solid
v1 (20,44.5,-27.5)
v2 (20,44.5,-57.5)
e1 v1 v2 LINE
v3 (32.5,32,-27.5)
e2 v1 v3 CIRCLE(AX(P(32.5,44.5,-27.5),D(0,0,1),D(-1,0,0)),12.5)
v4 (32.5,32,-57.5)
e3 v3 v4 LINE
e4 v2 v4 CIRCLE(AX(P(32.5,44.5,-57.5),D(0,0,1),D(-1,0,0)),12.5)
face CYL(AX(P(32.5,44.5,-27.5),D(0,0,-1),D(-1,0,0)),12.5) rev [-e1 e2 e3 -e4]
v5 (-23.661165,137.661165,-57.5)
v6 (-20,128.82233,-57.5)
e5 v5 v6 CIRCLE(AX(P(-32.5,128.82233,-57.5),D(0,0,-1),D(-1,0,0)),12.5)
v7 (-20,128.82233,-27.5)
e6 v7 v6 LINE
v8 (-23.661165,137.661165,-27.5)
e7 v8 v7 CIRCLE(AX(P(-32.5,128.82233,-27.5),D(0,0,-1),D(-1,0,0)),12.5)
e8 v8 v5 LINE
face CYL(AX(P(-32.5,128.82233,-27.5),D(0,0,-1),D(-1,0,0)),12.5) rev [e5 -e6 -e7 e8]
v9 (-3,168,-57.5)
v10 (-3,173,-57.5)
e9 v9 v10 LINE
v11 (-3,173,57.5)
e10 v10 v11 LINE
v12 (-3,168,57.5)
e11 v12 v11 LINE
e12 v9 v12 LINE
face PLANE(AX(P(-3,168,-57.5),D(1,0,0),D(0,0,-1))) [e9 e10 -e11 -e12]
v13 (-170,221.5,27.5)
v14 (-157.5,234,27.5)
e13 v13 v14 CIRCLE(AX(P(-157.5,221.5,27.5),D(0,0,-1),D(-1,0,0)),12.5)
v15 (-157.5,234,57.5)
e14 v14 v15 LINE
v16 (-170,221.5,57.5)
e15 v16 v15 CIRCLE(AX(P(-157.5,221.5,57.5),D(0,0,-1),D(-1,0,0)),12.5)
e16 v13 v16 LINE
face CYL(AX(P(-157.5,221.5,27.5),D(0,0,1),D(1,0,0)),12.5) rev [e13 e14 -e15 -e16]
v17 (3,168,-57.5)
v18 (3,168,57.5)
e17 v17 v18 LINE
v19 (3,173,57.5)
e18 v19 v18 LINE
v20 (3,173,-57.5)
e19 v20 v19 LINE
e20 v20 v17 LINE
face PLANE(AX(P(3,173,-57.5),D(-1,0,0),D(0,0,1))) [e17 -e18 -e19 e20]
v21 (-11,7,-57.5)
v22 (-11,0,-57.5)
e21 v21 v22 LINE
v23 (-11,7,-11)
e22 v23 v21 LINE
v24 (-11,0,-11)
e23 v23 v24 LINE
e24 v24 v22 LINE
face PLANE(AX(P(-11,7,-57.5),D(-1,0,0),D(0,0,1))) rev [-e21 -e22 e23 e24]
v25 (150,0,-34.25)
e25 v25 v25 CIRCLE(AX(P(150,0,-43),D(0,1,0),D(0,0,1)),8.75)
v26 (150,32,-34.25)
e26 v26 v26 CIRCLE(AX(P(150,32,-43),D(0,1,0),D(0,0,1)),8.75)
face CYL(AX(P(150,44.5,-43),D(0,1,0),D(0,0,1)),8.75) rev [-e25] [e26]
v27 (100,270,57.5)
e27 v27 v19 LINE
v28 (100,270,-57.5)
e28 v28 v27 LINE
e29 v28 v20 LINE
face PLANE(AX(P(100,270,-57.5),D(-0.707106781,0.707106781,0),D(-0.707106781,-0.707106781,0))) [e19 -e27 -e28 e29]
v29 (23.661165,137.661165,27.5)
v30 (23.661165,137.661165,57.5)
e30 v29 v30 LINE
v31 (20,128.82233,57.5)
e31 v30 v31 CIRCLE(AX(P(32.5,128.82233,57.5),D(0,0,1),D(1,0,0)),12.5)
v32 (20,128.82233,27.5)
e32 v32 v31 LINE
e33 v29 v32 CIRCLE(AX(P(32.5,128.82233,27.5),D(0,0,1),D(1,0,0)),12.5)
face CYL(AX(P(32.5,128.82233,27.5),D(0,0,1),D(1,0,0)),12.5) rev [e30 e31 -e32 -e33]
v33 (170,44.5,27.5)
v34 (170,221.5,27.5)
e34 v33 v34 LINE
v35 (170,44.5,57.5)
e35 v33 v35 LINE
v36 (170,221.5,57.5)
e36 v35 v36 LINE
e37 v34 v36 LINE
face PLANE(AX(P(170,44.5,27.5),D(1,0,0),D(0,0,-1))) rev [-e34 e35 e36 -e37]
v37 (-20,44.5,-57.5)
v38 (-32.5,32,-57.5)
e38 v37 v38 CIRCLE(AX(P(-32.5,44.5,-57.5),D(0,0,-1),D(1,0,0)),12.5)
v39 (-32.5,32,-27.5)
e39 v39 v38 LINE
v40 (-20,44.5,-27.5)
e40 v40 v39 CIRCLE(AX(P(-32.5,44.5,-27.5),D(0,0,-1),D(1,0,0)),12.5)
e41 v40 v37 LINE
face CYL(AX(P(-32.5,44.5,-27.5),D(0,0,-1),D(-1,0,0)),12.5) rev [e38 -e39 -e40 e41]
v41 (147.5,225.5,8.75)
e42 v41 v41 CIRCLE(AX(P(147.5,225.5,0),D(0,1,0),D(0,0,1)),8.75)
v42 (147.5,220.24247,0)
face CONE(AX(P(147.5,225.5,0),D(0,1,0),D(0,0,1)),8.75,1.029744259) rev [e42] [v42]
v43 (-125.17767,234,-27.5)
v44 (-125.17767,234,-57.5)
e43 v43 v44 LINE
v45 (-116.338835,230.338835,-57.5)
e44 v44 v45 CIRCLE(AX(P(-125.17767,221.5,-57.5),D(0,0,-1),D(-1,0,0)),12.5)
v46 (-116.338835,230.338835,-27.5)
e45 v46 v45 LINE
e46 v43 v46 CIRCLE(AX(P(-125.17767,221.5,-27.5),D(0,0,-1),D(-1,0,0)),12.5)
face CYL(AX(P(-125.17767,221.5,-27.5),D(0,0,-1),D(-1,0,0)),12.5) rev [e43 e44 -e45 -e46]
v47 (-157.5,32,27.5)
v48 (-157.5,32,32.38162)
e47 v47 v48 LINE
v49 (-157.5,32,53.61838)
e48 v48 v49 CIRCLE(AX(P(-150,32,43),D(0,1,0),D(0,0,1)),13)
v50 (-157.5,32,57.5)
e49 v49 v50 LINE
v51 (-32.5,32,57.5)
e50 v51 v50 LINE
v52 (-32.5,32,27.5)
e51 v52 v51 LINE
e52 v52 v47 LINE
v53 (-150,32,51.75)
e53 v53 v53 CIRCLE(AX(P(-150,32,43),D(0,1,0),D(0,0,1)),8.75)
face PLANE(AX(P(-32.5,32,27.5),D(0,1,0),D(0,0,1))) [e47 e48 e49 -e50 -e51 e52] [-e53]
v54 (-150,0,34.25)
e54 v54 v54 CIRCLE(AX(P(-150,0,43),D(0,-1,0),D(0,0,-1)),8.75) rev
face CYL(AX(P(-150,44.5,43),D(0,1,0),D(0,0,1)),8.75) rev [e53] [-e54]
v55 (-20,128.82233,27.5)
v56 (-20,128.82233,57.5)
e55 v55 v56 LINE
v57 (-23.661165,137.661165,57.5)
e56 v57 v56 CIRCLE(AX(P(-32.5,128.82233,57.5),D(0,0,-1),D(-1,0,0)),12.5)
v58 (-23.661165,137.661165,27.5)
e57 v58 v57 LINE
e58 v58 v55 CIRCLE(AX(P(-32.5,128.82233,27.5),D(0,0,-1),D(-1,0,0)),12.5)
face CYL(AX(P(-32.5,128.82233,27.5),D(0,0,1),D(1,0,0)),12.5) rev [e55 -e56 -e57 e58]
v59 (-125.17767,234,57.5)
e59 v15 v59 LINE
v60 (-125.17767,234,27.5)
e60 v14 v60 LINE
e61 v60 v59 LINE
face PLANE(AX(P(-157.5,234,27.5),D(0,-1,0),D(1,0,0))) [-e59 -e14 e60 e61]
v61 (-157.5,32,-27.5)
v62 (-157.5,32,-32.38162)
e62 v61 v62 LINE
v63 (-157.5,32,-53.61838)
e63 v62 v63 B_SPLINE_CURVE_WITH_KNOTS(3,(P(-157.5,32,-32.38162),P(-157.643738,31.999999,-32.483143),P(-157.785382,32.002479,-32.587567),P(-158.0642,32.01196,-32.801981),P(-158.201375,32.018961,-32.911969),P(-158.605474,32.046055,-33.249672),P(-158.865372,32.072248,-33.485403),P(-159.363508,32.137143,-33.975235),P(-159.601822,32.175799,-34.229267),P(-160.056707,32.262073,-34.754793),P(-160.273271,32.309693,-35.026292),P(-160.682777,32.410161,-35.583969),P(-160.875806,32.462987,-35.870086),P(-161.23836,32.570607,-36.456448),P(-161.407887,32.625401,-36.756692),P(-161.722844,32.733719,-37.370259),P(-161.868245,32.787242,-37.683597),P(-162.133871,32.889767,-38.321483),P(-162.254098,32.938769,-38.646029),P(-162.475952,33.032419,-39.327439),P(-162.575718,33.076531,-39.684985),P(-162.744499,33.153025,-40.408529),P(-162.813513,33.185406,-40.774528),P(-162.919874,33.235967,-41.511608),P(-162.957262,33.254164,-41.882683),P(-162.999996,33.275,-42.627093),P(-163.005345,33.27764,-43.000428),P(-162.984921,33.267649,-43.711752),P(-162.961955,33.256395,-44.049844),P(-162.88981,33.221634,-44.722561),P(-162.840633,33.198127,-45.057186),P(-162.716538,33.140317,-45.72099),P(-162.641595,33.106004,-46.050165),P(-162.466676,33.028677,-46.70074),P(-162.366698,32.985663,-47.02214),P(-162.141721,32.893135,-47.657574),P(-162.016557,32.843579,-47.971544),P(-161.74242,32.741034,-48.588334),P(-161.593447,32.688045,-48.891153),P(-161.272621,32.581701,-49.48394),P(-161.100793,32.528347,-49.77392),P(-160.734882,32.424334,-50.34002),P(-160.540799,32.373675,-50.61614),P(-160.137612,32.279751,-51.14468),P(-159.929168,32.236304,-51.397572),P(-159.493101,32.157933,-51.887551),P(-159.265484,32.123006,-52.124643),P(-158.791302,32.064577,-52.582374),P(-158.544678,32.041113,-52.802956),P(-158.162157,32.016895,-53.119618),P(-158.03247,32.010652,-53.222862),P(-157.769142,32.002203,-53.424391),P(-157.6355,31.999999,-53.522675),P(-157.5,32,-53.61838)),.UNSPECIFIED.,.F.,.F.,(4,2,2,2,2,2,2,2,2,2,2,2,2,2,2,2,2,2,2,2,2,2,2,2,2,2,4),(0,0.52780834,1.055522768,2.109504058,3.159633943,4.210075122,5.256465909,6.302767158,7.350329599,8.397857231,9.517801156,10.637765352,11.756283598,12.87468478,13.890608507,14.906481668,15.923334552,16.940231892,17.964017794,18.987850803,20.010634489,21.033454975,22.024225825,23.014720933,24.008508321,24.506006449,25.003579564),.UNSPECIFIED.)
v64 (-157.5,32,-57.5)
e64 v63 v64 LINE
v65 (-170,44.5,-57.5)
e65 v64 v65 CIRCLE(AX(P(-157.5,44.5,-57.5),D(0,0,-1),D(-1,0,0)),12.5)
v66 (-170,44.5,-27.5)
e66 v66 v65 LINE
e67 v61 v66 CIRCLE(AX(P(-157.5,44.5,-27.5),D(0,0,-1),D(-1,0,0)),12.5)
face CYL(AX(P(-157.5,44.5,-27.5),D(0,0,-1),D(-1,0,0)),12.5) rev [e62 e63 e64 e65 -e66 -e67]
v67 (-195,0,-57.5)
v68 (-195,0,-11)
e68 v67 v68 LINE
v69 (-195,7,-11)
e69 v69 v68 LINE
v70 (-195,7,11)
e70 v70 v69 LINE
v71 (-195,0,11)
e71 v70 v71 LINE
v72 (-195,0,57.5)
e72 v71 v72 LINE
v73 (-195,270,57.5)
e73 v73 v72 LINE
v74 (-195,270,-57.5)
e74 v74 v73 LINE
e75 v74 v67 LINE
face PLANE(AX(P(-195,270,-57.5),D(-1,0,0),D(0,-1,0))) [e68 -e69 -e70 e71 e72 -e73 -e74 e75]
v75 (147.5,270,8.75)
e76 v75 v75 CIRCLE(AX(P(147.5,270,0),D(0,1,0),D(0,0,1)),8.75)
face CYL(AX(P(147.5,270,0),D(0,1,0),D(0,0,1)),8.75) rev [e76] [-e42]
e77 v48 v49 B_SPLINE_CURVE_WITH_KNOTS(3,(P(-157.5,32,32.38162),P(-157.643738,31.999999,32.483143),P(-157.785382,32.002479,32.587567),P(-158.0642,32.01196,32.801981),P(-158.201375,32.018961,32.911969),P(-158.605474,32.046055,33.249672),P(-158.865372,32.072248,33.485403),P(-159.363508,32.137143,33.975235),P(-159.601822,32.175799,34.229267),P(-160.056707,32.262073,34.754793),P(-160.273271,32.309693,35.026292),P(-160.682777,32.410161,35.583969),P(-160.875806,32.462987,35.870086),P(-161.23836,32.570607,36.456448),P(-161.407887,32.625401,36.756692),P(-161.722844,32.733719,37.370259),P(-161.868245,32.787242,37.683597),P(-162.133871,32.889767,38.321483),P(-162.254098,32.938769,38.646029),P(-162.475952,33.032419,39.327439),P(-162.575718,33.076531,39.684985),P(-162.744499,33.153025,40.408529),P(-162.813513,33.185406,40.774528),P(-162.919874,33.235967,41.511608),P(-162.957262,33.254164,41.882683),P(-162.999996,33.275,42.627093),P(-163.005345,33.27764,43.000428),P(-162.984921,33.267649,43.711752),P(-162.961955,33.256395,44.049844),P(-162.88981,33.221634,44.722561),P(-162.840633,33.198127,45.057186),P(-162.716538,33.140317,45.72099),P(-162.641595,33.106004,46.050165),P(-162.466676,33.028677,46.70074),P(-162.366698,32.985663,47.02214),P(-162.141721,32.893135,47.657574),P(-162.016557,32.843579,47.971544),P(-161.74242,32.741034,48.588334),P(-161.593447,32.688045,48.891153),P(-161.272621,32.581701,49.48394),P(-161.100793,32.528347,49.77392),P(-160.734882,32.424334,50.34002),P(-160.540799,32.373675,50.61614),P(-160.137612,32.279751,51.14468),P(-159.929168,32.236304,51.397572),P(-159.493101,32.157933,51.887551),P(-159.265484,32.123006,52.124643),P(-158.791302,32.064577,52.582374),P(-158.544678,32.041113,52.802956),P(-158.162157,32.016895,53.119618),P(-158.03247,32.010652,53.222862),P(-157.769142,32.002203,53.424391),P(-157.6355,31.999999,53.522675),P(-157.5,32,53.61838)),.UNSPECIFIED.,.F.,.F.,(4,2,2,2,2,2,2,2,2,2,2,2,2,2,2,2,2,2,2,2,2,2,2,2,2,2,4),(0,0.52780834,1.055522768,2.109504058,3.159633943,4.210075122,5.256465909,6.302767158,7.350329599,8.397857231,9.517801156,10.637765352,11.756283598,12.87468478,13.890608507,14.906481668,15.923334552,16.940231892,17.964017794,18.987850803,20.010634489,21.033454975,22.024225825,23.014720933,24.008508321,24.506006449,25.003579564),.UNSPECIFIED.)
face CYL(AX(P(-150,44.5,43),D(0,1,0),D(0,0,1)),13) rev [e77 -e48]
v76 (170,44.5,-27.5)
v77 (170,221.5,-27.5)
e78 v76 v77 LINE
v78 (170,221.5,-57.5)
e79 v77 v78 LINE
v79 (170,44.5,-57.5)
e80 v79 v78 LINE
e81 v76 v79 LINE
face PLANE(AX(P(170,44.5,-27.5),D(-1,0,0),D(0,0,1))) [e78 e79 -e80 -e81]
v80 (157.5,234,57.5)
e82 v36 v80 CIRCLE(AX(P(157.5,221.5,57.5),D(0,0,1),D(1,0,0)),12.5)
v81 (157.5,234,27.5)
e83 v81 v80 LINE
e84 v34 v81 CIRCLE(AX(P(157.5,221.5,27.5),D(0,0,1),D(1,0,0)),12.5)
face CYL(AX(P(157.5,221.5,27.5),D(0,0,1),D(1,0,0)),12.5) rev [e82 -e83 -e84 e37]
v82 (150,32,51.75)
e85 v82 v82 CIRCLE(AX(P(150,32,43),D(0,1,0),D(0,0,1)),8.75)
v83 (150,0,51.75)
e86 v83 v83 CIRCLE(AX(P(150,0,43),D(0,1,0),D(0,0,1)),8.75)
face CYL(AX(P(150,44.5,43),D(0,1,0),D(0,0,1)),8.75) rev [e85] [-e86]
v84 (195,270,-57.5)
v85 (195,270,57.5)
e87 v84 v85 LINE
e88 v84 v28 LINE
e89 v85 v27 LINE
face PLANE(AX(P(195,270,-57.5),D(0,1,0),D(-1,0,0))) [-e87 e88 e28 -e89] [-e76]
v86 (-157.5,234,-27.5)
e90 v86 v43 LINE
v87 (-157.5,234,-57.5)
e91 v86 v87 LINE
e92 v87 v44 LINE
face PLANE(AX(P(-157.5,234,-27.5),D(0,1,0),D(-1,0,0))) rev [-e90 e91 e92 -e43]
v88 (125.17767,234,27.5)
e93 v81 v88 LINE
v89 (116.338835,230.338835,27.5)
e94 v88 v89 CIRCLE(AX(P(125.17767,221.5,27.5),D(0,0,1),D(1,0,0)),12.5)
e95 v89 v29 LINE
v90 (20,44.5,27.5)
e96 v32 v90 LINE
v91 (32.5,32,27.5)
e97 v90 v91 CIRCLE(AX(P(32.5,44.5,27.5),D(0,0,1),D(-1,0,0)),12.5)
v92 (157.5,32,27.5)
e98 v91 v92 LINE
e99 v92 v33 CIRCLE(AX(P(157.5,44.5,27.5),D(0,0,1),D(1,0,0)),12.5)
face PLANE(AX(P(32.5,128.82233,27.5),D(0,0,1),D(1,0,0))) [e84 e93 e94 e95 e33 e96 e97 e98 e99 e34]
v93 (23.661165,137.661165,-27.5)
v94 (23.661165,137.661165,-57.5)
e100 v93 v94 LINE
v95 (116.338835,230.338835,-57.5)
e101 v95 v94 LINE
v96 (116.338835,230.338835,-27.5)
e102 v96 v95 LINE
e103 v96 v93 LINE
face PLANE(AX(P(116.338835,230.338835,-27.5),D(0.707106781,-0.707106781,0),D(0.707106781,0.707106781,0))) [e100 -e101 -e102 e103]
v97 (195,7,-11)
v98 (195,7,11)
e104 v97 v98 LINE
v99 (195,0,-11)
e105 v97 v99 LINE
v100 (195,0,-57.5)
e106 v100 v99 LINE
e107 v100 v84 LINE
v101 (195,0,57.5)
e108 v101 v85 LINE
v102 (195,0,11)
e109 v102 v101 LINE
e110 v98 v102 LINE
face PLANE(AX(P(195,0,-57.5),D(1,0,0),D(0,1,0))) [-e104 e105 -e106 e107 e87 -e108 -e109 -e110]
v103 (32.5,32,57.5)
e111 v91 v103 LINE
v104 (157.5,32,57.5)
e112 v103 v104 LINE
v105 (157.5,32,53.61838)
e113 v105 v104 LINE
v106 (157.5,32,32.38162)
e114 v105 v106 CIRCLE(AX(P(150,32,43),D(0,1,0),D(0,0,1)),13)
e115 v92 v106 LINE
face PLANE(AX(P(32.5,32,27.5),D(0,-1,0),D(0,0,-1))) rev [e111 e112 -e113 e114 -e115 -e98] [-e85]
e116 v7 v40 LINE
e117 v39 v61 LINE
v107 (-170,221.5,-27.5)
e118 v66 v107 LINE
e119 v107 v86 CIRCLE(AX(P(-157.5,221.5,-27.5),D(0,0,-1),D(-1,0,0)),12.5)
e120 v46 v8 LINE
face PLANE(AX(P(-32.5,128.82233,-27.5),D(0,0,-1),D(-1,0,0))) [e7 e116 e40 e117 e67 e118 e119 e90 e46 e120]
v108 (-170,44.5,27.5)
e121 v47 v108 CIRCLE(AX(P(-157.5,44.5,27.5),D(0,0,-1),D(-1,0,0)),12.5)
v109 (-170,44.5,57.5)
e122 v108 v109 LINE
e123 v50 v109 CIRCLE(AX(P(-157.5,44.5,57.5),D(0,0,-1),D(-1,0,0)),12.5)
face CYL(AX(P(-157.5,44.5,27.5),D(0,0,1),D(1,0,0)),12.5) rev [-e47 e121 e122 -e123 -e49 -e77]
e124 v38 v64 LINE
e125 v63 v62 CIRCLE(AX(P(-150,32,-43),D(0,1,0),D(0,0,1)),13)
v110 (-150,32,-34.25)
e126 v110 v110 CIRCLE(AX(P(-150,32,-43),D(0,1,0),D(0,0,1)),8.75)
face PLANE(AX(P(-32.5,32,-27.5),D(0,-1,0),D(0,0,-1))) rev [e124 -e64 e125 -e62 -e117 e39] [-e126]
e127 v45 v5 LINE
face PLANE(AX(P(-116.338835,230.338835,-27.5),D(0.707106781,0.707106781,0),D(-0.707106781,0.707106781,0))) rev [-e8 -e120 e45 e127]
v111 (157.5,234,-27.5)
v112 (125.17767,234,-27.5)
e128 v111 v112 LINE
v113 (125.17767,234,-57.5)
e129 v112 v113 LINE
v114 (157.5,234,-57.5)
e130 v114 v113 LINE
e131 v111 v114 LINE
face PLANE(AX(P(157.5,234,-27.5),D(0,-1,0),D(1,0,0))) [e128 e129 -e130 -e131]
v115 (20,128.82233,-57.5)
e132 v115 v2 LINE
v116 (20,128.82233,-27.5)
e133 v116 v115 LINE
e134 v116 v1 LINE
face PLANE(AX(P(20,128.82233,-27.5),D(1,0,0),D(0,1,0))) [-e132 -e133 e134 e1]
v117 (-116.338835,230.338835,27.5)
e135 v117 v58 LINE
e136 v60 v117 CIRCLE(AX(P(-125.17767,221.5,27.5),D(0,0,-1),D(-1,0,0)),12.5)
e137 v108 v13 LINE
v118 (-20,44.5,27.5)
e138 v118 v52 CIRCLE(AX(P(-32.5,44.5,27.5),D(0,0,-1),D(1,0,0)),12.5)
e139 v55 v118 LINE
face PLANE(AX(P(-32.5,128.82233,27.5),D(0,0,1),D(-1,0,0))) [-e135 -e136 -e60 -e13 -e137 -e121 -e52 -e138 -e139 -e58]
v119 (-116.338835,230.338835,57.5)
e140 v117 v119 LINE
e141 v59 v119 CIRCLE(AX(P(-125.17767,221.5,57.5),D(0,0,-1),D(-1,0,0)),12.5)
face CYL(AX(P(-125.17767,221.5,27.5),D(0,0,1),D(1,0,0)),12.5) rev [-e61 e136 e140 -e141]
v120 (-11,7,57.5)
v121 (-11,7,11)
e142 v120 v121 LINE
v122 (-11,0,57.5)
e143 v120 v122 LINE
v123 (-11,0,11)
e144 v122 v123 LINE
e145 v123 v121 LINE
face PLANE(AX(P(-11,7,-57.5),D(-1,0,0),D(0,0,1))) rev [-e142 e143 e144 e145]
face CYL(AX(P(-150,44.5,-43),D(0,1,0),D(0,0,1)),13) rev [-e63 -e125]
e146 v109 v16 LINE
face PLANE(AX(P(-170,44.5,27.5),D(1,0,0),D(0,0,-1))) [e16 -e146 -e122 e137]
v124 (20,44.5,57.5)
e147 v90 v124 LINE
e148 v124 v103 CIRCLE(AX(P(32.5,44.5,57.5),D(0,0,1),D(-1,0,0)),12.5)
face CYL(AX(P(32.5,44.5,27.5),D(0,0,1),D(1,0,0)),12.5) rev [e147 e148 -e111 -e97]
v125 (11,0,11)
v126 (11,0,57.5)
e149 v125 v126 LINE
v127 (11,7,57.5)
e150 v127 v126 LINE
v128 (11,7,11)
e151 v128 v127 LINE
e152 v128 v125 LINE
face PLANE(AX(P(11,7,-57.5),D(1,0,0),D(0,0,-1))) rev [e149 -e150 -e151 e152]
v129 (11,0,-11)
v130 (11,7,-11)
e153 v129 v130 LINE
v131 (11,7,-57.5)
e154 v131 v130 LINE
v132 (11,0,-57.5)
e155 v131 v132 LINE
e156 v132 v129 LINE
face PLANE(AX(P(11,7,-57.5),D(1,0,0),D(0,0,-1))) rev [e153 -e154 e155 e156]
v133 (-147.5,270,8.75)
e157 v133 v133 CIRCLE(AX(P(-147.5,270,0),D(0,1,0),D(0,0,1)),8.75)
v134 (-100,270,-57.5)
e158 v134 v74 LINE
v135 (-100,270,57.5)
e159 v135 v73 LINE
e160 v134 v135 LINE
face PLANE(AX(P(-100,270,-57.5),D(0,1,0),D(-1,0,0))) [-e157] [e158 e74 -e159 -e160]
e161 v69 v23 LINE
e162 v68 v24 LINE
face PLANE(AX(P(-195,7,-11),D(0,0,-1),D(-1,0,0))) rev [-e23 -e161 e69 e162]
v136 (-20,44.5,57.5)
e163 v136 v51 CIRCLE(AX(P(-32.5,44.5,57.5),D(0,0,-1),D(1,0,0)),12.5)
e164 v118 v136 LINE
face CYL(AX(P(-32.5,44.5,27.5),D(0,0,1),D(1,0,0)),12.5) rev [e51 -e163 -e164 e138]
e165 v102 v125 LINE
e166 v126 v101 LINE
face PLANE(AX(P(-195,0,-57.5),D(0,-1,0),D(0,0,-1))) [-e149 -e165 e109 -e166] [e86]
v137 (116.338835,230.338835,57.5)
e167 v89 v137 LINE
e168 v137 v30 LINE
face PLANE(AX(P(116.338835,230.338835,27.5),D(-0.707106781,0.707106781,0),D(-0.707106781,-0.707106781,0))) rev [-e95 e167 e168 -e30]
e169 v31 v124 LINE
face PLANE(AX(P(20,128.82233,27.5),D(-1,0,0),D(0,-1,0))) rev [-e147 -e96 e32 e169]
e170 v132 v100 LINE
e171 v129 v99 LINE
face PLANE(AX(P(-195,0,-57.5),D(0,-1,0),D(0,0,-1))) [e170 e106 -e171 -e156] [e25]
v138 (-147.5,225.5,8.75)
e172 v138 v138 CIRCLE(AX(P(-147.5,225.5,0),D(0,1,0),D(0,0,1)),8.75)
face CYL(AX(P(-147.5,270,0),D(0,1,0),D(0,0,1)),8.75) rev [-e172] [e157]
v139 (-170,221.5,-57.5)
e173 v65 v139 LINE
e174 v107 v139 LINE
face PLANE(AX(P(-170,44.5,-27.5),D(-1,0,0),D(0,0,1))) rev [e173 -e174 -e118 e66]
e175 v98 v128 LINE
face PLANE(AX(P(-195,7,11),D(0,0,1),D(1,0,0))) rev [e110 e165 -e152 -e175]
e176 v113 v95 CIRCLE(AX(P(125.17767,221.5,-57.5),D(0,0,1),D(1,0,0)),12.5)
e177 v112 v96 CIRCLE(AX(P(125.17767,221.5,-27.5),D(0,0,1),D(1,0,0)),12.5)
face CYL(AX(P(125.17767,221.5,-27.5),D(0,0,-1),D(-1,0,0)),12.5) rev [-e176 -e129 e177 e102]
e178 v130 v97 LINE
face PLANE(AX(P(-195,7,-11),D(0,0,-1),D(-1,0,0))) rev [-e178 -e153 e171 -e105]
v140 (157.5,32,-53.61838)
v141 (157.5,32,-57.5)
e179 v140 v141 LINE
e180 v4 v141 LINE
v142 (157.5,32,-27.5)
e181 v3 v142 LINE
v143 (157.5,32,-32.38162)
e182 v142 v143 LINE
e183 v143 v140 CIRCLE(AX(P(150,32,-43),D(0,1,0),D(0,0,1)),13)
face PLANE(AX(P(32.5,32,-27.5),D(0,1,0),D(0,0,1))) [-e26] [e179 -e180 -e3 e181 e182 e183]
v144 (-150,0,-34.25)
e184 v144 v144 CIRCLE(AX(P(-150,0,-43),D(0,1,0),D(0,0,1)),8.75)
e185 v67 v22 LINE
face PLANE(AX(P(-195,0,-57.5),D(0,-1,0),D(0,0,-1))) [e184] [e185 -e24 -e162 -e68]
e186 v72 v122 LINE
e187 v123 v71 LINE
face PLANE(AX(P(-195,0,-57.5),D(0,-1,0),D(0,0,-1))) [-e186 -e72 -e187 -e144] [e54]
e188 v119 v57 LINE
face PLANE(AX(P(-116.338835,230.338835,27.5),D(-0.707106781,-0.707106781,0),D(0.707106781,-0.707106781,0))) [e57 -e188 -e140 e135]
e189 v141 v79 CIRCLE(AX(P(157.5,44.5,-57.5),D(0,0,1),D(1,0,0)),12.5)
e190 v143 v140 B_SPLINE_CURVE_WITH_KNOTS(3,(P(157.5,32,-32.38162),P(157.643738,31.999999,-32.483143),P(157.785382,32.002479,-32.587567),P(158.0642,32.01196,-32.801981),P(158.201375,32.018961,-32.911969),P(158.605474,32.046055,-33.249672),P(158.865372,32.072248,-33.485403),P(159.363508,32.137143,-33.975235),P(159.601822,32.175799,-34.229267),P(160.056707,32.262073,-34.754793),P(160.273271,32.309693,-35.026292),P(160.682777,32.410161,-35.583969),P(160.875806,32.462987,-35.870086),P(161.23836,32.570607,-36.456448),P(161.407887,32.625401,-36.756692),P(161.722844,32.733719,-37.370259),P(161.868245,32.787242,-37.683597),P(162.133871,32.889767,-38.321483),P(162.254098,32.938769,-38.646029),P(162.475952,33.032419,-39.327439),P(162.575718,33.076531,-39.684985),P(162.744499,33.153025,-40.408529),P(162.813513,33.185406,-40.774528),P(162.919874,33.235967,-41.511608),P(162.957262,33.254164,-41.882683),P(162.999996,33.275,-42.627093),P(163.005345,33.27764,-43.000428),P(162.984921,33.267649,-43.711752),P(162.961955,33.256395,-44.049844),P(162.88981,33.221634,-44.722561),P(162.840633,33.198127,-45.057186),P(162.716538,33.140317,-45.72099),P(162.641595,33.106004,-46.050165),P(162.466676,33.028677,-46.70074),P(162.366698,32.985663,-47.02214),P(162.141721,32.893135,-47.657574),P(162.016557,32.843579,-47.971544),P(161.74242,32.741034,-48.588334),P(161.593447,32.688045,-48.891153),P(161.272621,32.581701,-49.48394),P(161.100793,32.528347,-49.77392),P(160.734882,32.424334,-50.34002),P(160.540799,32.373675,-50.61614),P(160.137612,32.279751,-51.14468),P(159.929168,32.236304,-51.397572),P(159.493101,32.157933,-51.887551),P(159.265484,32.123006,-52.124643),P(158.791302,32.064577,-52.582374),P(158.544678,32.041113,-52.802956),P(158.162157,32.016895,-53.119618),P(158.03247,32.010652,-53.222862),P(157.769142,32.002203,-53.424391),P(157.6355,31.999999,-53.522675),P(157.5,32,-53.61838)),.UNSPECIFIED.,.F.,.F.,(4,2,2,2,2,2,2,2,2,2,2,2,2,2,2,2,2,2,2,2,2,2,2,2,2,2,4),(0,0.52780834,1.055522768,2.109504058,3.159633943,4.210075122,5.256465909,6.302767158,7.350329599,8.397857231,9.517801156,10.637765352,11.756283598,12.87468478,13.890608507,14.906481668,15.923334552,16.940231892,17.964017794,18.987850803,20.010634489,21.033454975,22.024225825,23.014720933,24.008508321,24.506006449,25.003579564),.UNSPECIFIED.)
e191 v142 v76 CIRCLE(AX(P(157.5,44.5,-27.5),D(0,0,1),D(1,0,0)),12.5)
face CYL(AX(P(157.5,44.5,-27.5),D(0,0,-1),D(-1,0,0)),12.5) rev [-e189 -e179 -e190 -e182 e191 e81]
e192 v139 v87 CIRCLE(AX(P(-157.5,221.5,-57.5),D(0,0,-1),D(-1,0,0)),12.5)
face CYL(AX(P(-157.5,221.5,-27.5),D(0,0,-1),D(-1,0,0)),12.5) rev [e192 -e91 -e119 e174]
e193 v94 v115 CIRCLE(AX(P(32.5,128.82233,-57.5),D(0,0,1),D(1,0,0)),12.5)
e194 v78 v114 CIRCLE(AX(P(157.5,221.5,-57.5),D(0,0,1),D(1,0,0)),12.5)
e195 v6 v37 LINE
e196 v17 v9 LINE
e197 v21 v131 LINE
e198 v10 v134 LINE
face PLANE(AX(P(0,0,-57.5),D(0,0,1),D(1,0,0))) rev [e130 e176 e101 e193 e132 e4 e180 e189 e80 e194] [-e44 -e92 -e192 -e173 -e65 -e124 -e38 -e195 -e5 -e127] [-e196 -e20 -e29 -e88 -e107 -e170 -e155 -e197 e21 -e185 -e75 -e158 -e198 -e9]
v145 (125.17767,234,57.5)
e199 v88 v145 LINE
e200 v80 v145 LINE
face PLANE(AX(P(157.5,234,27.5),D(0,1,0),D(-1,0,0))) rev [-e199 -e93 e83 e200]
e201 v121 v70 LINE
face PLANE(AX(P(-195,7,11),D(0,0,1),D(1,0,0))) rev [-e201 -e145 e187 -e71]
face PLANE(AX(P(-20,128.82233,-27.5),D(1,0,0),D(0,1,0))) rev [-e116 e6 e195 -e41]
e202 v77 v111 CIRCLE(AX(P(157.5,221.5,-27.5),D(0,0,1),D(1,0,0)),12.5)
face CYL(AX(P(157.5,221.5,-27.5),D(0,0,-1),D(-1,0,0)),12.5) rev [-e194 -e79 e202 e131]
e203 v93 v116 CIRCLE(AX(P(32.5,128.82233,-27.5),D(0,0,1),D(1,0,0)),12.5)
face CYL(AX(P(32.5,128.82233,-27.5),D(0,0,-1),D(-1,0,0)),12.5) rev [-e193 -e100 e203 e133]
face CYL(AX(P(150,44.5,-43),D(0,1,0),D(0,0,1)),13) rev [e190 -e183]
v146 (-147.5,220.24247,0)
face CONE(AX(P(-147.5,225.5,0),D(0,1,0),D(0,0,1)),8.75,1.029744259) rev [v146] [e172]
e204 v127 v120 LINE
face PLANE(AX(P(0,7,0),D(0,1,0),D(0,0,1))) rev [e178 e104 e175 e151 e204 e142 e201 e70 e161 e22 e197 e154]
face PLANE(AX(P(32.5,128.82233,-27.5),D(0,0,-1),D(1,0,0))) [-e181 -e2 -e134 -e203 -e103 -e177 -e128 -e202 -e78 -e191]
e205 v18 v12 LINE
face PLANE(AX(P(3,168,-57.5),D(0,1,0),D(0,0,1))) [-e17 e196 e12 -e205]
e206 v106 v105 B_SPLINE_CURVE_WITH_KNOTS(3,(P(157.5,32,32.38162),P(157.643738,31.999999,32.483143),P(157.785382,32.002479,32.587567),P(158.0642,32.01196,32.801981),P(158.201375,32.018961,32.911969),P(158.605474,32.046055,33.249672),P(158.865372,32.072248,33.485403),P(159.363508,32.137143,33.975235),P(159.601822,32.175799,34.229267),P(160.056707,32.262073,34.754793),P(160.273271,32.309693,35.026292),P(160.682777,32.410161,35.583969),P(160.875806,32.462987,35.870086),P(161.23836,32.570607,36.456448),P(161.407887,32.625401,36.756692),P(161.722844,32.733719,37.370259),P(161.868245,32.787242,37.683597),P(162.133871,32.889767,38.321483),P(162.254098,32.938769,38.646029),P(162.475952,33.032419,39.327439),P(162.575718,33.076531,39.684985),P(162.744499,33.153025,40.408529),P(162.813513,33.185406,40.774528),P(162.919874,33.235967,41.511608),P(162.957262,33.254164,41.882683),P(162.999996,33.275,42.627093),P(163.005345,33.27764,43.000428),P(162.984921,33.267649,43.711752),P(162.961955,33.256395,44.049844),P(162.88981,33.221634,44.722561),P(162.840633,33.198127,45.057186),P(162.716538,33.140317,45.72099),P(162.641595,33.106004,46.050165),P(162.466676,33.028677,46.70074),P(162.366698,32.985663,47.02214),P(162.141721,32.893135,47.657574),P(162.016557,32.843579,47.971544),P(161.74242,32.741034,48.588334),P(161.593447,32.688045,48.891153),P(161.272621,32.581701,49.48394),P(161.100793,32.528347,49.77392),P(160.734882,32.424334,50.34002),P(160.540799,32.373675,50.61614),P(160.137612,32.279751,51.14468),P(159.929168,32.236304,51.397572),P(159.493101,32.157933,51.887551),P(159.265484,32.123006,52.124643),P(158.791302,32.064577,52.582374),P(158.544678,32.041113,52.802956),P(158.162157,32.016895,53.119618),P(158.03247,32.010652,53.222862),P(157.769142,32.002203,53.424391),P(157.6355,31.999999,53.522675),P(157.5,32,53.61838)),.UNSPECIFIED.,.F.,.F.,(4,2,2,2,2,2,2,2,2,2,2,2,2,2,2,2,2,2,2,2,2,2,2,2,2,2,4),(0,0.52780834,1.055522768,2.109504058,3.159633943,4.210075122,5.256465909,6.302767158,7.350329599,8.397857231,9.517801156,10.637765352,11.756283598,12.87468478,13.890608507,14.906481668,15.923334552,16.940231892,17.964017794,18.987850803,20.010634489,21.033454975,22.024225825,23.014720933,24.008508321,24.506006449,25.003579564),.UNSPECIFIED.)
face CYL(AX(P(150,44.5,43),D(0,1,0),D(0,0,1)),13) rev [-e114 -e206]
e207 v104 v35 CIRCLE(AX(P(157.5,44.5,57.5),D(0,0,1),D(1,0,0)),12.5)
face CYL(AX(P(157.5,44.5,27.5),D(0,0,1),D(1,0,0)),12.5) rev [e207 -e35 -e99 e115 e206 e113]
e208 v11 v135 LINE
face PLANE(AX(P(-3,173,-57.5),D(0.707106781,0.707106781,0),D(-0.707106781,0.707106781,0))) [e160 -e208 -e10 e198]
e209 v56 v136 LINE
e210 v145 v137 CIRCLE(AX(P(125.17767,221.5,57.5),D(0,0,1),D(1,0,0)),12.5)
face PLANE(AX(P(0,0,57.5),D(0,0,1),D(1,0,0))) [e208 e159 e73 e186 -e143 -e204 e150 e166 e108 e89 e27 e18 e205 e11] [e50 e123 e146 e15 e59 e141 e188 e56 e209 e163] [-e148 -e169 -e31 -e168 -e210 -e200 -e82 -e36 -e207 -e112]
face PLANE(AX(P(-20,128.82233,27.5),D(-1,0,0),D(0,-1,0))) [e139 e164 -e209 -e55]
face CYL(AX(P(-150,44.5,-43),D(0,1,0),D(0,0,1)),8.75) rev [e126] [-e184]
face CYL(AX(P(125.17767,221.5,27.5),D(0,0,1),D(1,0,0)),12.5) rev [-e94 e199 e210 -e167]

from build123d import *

# Parameters (mm, degrees)
BOSS_EXTRUDE1_DEPTH                            = 57.5
CUT_EXTRUDE1_DEPTH                             = 30
M20_TAPPED_HOLE1_D                             = 17.5
M20_TAPPED_HOLE1_DEPTH                         = 44.5
M20_TAPPED_HOLE1_TIP                           = 5.257530416491153
MIRROR2_COPY_1_DEPTH                           = 30
CUT_EXTRUDE2_DEPTH                             = 7
CUT_EXTRUDE3_DEPTH                             = 7
CBORE_START                                    = -1
CBORE_FOR_M16_HEX_SOCKET_HEAD_CAP_SC_2_R       = 8.75
CBORE_FOR_M16_HEX_SOCKET_HEAD_CAP_SCREW1_DEPTH = 34.275018433
CBORE_START_2                                  = 32
CBORE_FOR_M16_HEX_SOCKET_HEAD_CAP_SC_3_O_R     = 8.75
CBORE_FOR_M16_HEX_SOCKET_HEAD_CAP_SC_3_DEPTH   = 12.5


with BuildPart() as part:
    # Sketch1 → Boss-Extrude1 (new, symmetric)
    with BuildSketch(Plane.XY):
        Polygon((-195, 0), (195, 0), (195.00000000000003, 270), (99.9999999999997, 270.00000000000006), (2.999999999999999, 173.00000000000009), (2.999999999999999, 168.0000000000001), (-2.999999999999999, 168.0000000000001), (-2.999999999999999, 173.00000000000009), (-99.9999999999997, 270.00000000000006), (-195.00000000000003, 270), align=None)
    extrude(amount=BOSS_EXTRUDE1_DEPTH, both=True)

    # Sketch2 → Cut-Extrude1 (cut)
    with BuildSketch(Plane.XY.offset(57.5)):
        with BuildLine():
            Line((32.500000000000014, 32), (157.5, 32))
            ThreePointArc((157.5, 32), (166.33883476483186, 35.661165235168156), (170, 44.5))
            Line((170, 44.5), (170, 221.49999999999997))
            ThreePointArc((170, 221.49999999999997), (166.33883476483186, 230.3388347648318), (157.5, 234))
            Line((157.5, 234), (125.17766952966375, 233.99999999999997))
            ThreePointArc((125.17766952966375, 233.99999999999997), (120.39412662510011, 233.04849415639106), (116.3388347648319, 230.3388347648318))
            Line((116.3388347648319, 230.3388347648318), (23.661165235168177, 137.66116523516763))
            ThreePointArc((23.661165235168177, 137.66116523516763), (20.95150584360897, 133.60587337489943), (20.000000000000004, 128.82233047033586))
            Line((20.000000000000004, 128.82233047033586), (20.000000000000014, 44.5))
            ThreePointArc((20.000000000000014, 44.5), (23.66116523516817, 35.661165235168156), (32.500000000000014, 32))
        make_face()
    cut_extrude1 = extrude(amount=-CUT_EXTRUDE1_DEPTH, mode=Mode.SUBTRACT)

    # M20 Tapped Hole1
    with Locations(Plane(origin=(-1.5777e-13, 270.0000000000001, 0), x_dir=(1, 0, 0), z_dir=(0, 1, 0))):
        with Locations((-147.5, 0), (147.5, 0)):
            Hole(M20_TAPPED_HOLE1_D / 2, depth=M20_TAPPED_HOLE1_DEPTH)
            with Locations((0, 0, -(M20_TAPPED_HOLE1_DEPTH + M20_TAPPED_HOLE1_TIP / 2))):  # 118° drill point
                Cone(0, M20_TAPPED_HOLE1_D / 2, M20_TAPPED_HOLE1_TIP, mode=Mode.SUBTRACT)

    # Mirror1: Cut-Extrude1 across plane
    add(cut_extrude1.mirror(Plane(origin=(0, 0, 0), x_dir=(0, 0, 1), z_dir=(1, 0, 0))), mode=Mode.SUBTRACT)

    # Mirror2: Cut-Extrude1 across plane
    add(cut_extrude1.mirror(Plane.XY), mode=Mode.SUBTRACT)

    # Mirror2 copy 1 sketch → Mirror2 copy 1 (cut)
    with BuildSketch(Plane(origin=(0, 0, -57.5), x_dir=(-1, 0, 0), z_dir=(0, 0, -1))):
        with BuildLine():
            Line((32.500000000000014, 32), (157.5, 32))
            ThreePointArc((157.5, 32), (166.33883476483186, 35.661165235168156), (170, 44.5))
            Line((170, 44.5), (170, 221.49999999999997))
            ThreePointArc((170, 221.49999999999997), (166.33883476483186, 230.3388347648318), (157.5, 234))
            Line((157.5, 234), (125.17766952966375, 233.99999999999997))
            ThreePointArc((125.17766952966375, 233.99999999999997), (120.39412662510011, 233.04849415639106), (116.3388347648319, 230.3388347648318))
            Line((116.3388347648319, 230.3388347648318), (23.661165235168177, 137.66116523516763))
            ThreePointArc((23.661165235168177, 137.66116523516763), (20.95150584360897, 133.60587337489943), (20.000000000000004, 128.82233047033586))
            Line((20.000000000000004, 128.82233047033586), (20.000000000000014, 44.5))
            ThreePointArc((20.000000000000014, 44.5), (23.66116523516817, 35.661165235168156), (32.500000000000014, 32))
        make_face()
    extrude(amount=-MIRROR2_COPY_1_DEPTH, mode=Mode.SUBTRACT)

    # Sketch5 → Cut-Extrude2 (cut)
    with BuildSketch(Plane.XZ):
        Polygon((-11.00000000000001, -57.5), (11.00000000000001, -57.5), (11, 57.5), (-11, 57.5), align=None)
    extrude(amount=-CUT_EXTRUDE2_DEPTH, mode=Mode.SUBTRACT)

    # Sketch6 → Cut-Extrude3 (cut)
    with BuildSketch(Plane.XZ):
        Polygon((-195, -11.000000000000004), (195, -11), (195, 11), (-195, 11.000000000000004), align=None)
    extrude(amount=-CUT_EXTRUDE3_DEPTH, mode=Mode.SUBTRACT)

    # CBORE for M16 Hex Socket Head Cap Screw1: read off the stored shape, not the designer's step
    # CBORE for M16 Hex Socket Head Cap Sc 2 → CBORE for M16 Hex Socket Head Cap Screw1 (cut)
    with BuildSketch(Plane(origin=(0, 0, 0), x_dir=(1, 0, 0), z_dir=(0, 1, 0)).offset(CBORE_START)):
        with Locations((-150, -43)):
            Circle(CBORE_FOR_M16_HEX_SOCKET_HEAD_CAP_SC_2_R)
    extrude(amount=CBORE_FOR_M16_HEX_SOCKET_HEAD_CAP_SCREW1_DEPTH, mode=Mode.SUBTRACT)

    # CBORE for M16 Hex Socket Head Cap Sc 3 o → CBORE for M16 Hex Socket Head Cap Sc 3 (cut)
    with BuildSketch(Plane(origin=(0, 0, 0), x_dir=(1, 0, 0), z_dir=(0, 1, 0)).offset(CBORE_START_2)):
        with BuildLine():
            Line((-155.543924868, -31), (-157.5, -32.381619709))
            ThreePointArc((-157.5, -32.381619709), (-163, -43), (-157.5, -53.618380291))
            Line((-157.5, -53.618380291), (-155.543924868, -55))
            Line((-155.543924868, -55), (-140, -55))
            Line((-140, -55), (-140, -31))
            Line((-140, -31), (-155.543924868, -31))
        make_face()
        with Locations((-150, -43)):
            Circle(CBORE_FOR_M16_HEX_SOCKET_HEAD_CAP_SC_3_O_R, mode=Mode.SUBTRACT)
    extrude(amount=CBORE_FOR_M16_HEX_SOCKET_HEAD_CAP_SC_3_DEPTH, mode=Mode.SUBTRACT)

    # LPattern1: read off the stored shape, not the designer's step
    # LPattern1: loft between two sections, ruled curve by curve
    lpattern1_from = [
        Edge.make_three_point_arc((-157.5, 31.999999688, -53.618380291), (-163, 31.999999688, -43), (-157.5, 31.999999688, -32.381619709)),
        Edge.make_line((-157.5, 31.999999688, -32.381619709), (-157.5, 31.999999688, -53.618380291)),
    ]
    lpattern1_to = [
        Edge.make_three_point_arc((-157.5, 33.2753422, -53.618380291), (-163, 33.2753422, -43), (-157.5, 33.2753422, -32.381619709)),
        Edge.make_line((-157.5, 33.2753422, -32.381619709), (-157.5, 33.2753422, -53.618380291)),
    ]
    lpattern1 = Solid(Shell([*[Face.make_surface_from_curves(lpattern1_from[k], lpattern1_to[k]) for k in range(2)], Face(Wire(lpattern1_from)), Face(Wire(lpattern1_to))]))
    add(lpattern1, mode=Mode.SUBTRACT)

    # LPattern1 2: loft between two sections, ruled curve by curve
    lpattern1_2_from = [
        Edge.make_three_point_arc((-150, 0, -34.25), (-141.25, 0, -43), (-150, 0, -51.75)),
        Edge.make_three_point_arc((-150, 0, -51.75), (-158.75, 0, -43), (-150, 0, -34.25)),
    ]
    lpattern1_2_to = [
        Edge.make_three_point_arc((-150, 32, -34.25), (-141.25, 32, -43), (-150, 32, -51.75)),
        Edge.make_three_point_arc((-150, 32, -51.75), (-158.75, 32, -43), (-150, 32, -34.25)),
    ]
    lpattern1_2 = Solid(Shell([*[Face.make_surface_from_curves(lpattern1_2_from[k], lpattern1_2_to[k]) for k in range(2)], Face(Wire(lpattern1_2_from)), Face(Wire(lpattern1_2_to))]))
    add(lpattern1_2, mode=Mode.SUBTRACT)

    # LPattern1 3: loft between two sections, ruled curve by curve
    lpattern1_3_from = [
        Edge.make_three_point_arc((157.5, 31.999999688, 53.618380291), (163, 31.999999688, 43), (157.5, 31.999999688, 32.381619709)),
        Edge.make_line((157.5, 31.999999688, 32.381619709), (157.5, 31.999999688, 53.618380291)),
    ]
    lpattern1_3_to = [
        Edge.make_three_point_arc((157.5, 33.2753422, 53.618380291), (163, 33.2753422, 43), (157.5, 33.2753422, 32.381619709)),
        Edge.make_line((157.5, 33.2753422, 32.381619709), (157.5, 33.2753422, 53.618380291)),
    ]
    lpattern1_3 = Solid(Shell([*[Face.make_surface_from_curves(lpattern1_3_from[k], lpattern1_3_to[k]) for k in range(2)], Face(Wire(lpattern1_3_from)), Face(Wire(lpattern1_3_to))]))
    add(lpattern1_3, mode=Mode.SUBTRACT)

    # LPattern1 4: loft between two sections, ruled curve by curve
    lpattern1_4_from = [
        Edge.make_three_point_arc((150, 0, 51.75), (158.75, 0, 43), (150, 0, 34.25)),
        Edge.make_three_point_arc((150, 0, 34.25), (141.25, 0, 43), (150, 0, 51.75)),
    ]
    lpattern1_4_to = [
        Edge.make_three_point_arc((150, 32, 51.75), (158.75, 32, 43), (150, 32, 34.25)),
        Edge.make_three_point_arc((150, 32, 34.25), (141.25, 32, 43), (150, 32, 51.75)),
    ]
    lpattern1_4 = Solid(Shell([*[Face.make_surface_from_curves(lpattern1_4_from[k], lpattern1_4_to[k]) for k in range(2)], Face(Wire(lpattern1_4_from)), Face(Wire(lpattern1_4_to))]))
    add(lpattern1_4, mode=Mode.SUBTRACT)

    # LPattern1 5: loft between two sections, ruled curve by curve
    lpattern1_5_from = [
        Edge.make_three_point_arc((150, 0, -34.25), (158.75, 0, -43), (150, 0, -51.75)),
        Edge.make_three_point_arc((150, 0, -51.75), (141.25, 0, -43), (150, 0, -34.25)),
    ]
    lpattern1_5_to = [
        Edge.make_three_point_arc((150, 32, -34.25), (158.75, 32, -43), (150, 32, -51.75)),
        Edge.make_three_point_arc((150, 32, -51.75), (141.25, 32, -43), (150, 32, -34.25)),
    ]
    lpattern1_5 = Solid(Shell([*[Face.make_surface_from_curves(lpattern1_5_from[k], lpattern1_5_to[k]) for k in range(2)], Face(Wire(lpattern1_5_from)), Face(Wire(lpattern1_5_to))]))
    add(lpattern1_5, mode=Mode.SUBTRACT)

    # LPattern1 6: loft between two sections, ruled curve by curve
    lpattern1_6_from = [
        Edge.make_three_point_arc((157.5, 31.999999688, -32.381619709), (163, 31.999999688, -43), (157.5, 31.999999688, -53.618380291)),
        Edge.make_line((157.5, 31.999999688, -53.618380291), (157.5, 31.999999688, -32.381619709)),
    ]
    lpattern1_6_to = [
        Edge.make_three_point_arc((157.5, 33.2753422, -32.381619709), (163, 33.2753422, -43), (157.5, 33.2753422, -53.618380291)),
        Edge.make_line((157.5, 33.2753422, -53.618380291), (157.5, 33.2753422, -32.381619709)),
    ]
    lpattern1_6 = Solid(Shell([*[Face.make_surface_from_curves(lpattern1_6_from[k], lpattern1_6_to[k]) for k in range(2)], Face(Wire(lpattern1_6_from)), Face(Wire(lpattern1_6_to))]))
    add(lpattern1_6, mode=Mode.SUBTRACT)


solid = part.part
